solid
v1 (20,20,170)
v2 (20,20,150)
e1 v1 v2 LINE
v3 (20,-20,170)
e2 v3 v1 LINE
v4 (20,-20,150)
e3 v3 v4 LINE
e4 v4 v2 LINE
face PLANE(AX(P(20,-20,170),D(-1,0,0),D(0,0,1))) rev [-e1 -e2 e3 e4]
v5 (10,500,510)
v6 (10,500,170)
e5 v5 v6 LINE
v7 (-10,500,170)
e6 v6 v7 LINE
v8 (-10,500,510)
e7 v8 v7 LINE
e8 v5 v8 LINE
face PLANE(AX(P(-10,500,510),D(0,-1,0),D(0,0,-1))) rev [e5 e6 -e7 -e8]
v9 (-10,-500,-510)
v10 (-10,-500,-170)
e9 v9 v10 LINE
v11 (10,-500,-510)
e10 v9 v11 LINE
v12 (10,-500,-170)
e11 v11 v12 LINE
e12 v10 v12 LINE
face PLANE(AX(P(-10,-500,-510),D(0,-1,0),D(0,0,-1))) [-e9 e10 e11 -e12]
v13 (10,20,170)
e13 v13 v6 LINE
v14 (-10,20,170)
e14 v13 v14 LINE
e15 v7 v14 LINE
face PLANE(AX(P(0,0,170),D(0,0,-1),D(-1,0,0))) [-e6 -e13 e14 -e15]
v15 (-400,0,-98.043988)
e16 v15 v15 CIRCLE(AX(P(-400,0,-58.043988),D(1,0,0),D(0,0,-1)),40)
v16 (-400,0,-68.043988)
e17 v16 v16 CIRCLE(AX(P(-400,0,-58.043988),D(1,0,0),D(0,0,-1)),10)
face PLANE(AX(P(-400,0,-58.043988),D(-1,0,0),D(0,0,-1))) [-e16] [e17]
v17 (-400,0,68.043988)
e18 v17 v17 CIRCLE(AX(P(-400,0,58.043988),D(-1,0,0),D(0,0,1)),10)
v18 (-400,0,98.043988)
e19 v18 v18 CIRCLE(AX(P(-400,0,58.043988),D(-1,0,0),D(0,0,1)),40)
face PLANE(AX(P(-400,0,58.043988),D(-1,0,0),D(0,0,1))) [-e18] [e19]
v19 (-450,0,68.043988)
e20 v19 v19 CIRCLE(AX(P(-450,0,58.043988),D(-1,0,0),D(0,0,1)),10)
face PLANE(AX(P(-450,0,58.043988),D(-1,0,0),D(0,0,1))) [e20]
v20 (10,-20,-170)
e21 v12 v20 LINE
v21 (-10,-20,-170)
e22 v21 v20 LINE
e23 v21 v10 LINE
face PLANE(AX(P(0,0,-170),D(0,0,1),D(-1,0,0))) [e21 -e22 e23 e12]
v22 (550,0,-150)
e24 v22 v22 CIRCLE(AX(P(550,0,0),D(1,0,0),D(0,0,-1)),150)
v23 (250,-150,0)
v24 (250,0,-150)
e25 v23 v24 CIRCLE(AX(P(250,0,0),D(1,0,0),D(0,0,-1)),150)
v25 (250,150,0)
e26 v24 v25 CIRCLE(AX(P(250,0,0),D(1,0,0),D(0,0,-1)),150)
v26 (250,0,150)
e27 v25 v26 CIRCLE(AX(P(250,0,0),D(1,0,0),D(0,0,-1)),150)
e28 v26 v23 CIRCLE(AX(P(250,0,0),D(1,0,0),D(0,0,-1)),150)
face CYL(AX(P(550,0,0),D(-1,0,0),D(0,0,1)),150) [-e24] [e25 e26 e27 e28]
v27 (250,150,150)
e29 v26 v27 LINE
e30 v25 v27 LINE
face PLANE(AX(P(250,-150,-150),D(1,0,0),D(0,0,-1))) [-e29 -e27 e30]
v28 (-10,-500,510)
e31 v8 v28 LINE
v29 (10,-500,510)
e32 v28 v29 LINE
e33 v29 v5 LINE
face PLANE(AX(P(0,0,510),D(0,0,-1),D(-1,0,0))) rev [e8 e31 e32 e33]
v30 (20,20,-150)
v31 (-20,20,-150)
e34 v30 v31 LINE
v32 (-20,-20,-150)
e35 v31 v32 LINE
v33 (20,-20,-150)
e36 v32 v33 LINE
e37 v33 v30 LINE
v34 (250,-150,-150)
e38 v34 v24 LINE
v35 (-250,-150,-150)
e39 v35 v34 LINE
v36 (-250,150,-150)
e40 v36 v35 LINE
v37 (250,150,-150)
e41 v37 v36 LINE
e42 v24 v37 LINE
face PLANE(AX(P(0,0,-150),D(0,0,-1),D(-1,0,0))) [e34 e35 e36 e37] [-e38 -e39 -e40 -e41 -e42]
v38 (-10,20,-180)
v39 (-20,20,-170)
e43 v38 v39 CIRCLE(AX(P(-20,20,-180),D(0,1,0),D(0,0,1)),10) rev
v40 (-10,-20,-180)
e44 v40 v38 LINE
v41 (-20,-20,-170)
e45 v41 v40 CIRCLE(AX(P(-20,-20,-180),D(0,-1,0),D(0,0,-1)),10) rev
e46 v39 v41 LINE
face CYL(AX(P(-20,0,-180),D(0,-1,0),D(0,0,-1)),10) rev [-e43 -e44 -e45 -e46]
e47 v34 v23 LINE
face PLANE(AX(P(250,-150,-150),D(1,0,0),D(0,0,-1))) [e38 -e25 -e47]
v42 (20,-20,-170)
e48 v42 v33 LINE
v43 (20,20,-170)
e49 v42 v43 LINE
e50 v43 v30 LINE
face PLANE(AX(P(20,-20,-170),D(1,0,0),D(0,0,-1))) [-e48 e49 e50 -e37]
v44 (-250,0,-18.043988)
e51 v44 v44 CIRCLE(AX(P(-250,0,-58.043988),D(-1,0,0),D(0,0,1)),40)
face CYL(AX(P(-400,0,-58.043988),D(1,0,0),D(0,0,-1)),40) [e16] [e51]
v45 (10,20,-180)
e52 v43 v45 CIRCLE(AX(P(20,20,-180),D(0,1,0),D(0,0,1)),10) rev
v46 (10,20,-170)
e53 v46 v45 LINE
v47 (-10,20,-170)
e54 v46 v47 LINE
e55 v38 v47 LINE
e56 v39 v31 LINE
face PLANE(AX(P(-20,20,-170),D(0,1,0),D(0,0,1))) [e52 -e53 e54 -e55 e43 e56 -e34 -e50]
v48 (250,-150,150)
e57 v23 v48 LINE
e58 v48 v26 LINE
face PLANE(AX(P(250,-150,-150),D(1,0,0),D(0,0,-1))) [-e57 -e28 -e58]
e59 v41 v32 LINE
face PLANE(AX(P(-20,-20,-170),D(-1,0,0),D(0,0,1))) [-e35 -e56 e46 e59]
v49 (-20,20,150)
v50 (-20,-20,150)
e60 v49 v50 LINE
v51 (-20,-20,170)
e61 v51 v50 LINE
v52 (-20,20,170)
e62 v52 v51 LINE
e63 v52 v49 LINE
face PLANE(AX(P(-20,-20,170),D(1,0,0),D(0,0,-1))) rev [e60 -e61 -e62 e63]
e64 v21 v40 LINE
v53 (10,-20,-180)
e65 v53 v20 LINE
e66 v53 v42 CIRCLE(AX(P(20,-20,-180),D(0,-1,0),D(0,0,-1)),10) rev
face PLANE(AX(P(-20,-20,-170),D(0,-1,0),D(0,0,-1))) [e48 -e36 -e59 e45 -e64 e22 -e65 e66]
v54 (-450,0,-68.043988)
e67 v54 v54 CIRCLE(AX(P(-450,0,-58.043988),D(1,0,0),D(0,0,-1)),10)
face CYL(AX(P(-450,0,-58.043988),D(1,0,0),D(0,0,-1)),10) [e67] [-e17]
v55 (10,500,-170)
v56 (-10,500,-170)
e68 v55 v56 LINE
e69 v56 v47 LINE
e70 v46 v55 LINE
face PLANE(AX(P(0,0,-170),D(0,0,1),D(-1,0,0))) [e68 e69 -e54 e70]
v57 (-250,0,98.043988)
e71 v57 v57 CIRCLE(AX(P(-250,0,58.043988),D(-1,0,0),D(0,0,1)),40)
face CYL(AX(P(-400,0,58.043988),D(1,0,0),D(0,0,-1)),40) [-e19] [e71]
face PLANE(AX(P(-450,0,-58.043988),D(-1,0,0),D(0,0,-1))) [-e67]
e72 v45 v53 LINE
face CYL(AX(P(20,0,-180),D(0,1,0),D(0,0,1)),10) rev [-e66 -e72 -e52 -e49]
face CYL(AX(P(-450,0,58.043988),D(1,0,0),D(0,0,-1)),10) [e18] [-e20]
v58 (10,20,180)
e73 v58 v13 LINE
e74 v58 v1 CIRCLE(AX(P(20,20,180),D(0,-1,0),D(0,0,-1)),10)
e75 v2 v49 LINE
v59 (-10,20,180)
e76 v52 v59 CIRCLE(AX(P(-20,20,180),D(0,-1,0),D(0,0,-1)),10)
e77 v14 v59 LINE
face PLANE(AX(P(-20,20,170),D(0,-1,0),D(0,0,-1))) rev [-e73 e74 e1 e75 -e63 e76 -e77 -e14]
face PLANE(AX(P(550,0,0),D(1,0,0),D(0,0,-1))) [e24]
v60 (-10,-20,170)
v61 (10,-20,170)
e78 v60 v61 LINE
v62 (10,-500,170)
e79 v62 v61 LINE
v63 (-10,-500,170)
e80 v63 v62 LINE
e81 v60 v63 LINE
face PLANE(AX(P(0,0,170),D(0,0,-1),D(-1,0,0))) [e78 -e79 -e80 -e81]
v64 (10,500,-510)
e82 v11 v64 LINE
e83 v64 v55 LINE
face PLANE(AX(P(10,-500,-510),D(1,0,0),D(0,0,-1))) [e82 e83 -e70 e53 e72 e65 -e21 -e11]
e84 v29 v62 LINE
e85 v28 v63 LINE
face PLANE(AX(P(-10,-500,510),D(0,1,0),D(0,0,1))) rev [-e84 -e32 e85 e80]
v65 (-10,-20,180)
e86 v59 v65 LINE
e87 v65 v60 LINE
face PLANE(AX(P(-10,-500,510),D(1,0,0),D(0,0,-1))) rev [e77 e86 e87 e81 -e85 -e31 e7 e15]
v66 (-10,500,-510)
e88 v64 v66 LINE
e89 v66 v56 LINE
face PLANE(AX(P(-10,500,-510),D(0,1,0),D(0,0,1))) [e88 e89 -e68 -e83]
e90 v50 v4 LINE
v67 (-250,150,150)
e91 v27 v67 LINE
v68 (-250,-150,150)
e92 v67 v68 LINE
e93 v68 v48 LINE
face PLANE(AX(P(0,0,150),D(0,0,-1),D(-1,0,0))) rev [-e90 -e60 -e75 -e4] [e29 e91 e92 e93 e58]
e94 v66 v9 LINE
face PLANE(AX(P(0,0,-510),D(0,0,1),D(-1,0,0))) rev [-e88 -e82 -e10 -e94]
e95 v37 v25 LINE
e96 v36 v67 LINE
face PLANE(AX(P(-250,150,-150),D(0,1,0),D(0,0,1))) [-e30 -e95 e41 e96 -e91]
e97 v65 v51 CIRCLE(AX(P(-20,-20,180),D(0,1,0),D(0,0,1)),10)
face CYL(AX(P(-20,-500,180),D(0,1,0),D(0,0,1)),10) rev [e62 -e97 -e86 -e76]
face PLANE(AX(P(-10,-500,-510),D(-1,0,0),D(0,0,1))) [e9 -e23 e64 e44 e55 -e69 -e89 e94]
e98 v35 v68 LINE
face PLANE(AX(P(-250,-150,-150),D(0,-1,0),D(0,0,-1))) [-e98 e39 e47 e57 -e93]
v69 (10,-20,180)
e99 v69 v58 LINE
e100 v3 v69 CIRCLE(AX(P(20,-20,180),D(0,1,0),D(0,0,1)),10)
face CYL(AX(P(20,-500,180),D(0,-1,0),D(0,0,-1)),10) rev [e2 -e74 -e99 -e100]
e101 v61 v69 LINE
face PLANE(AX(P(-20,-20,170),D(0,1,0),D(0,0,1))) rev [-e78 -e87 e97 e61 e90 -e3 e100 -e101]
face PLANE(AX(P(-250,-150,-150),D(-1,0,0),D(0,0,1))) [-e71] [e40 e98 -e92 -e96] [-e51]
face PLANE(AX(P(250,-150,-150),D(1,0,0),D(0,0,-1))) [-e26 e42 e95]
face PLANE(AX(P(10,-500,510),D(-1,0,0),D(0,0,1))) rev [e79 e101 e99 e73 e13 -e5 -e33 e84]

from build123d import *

# Parameters (mm, degrees)
BOSS_EXTRUDE1_DEPTH      = 150
BOSS_EXTRUDE1_DEPTH_BACK = 150
SKETCH1_W                = 500
SKETCH1_H                = 300
SKETCH2_W                = 40
SKETCH2_H                = 40
BOSS_EXTRUDE2_DEPTH      = 20
SKETCH3_W                = 20
SKETCH3_H                = 1000
BOSS_EXTRUDE3_DEPTH      = 340
FILLET1_R                = 10
SKETCH4_R                = 40
BOSS_EXTRUDE4_DEPTH      = 150
SKETCH5_R                = 10
BOSS_EXTRUDE5_DEPTH      = 50
FILLET1_OF_MIRROR1_R     = 10
SKETCH7_R                = 150
BOSS_EXTRUDE6_DEPTH      = 300


with BuildPart() as part:
    # Sketch1 → Boss-Extrude1 (new, two sides: drawn at the far end of the back side and taken through both)
    with BuildSketch(Plane.XY.offset(-BOSS_EXTRUDE1_DEPTH_BACK)):
        Rectangle(SKETCH1_W, SKETCH1_H)
    extrude(amount=BOSS_EXTRUDE1_DEPTH + BOSS_EXTRUDE1_DEPTH_BACK)

    # Sketch2 → Boss-Extrude2 (add)
    with BuildSketch(Plane.XY.offset(150)):
        Rectangle(SKETCH2_W, SKETCH2_H)
    boss_extrude2 = extrude(amount=BOSS_EXTRUDE2_DEPTH)

    # Sketch3 → Boss-Extrude3 (add)
    with BuildSketch(Plane.XY.offset(170)):
        Rectangle(SKETCH3_W, SKETCH3_H)
    boss_extrude3 = extrude(amount=BOSS_EXTRUDE3_DEPTH)

    # Fillet1
    fillet1_edges = [part.edges().sort_by_distance(p)[0] for p in [
        (-10, 0, 170),
        (10, 0, 170),
    ]]
    fillet(fillet1_edges, radius=FILLET1_R - 0.0001)  # a hair under: the kernel refuses the full size

    # Sketch4 → Boss-Extrude4 (add)
    with BuildSketch(Plane.ZY.offset(250)):
        with Locations((58.043987529, 0)):
            Circle(SKETCH4_R)
    boss_extrude4 = extrude(amount=BOSS_EXTRUDE4_DEPTH)

    # Sketch5 → Boss-Extrude5 (add)
    with BuildSketch(Plane.ZY.offset(400)):
        with Locations((58.043987529, 0)):
            Circle(SKETCH5_R)
    boss_extrude5 = extrude(amount=BOSS_EXTRUDE5_DEPTH)

    # Mirror1: Boss-Extrude2, Boss-Extrude3, Boss-Extrude4, Boss-Extrude5 across plane
    add(boss_extrude2.mirror(Plane.XY))
    add(boss_extrude3.mirror(Plane.XY))
    add(boss_extrude4.mirror(Plane.XY))
    add(boss_extrude5.mirror(Plane.XY))

    # Fillet1 of Mirror1
    fillet1_of_mirror1_edges = [part.edges().sort_by_distance(p)[0] for p in [
        (-10, 0, -170),
        (10, 0, -170),
    ]]
    fillet(fillet1_of_mirror1_edges, radius=FILLET1_OF_MIRROR1_R - 0.0001)  # a hair under: the kernel refuses the full size

    # Sketch7 → Boss-Extrude6 (add)
    with BuildSketch(Plane(origin=(250, 0, 0), x_dir=(0, 0, -1), z_dir=(1, 0, 0))):
        Circle(SKETCH7_R)
    extrude(amount=BOSS_EXTRUDE6_DEPTH)


solid = part.part
